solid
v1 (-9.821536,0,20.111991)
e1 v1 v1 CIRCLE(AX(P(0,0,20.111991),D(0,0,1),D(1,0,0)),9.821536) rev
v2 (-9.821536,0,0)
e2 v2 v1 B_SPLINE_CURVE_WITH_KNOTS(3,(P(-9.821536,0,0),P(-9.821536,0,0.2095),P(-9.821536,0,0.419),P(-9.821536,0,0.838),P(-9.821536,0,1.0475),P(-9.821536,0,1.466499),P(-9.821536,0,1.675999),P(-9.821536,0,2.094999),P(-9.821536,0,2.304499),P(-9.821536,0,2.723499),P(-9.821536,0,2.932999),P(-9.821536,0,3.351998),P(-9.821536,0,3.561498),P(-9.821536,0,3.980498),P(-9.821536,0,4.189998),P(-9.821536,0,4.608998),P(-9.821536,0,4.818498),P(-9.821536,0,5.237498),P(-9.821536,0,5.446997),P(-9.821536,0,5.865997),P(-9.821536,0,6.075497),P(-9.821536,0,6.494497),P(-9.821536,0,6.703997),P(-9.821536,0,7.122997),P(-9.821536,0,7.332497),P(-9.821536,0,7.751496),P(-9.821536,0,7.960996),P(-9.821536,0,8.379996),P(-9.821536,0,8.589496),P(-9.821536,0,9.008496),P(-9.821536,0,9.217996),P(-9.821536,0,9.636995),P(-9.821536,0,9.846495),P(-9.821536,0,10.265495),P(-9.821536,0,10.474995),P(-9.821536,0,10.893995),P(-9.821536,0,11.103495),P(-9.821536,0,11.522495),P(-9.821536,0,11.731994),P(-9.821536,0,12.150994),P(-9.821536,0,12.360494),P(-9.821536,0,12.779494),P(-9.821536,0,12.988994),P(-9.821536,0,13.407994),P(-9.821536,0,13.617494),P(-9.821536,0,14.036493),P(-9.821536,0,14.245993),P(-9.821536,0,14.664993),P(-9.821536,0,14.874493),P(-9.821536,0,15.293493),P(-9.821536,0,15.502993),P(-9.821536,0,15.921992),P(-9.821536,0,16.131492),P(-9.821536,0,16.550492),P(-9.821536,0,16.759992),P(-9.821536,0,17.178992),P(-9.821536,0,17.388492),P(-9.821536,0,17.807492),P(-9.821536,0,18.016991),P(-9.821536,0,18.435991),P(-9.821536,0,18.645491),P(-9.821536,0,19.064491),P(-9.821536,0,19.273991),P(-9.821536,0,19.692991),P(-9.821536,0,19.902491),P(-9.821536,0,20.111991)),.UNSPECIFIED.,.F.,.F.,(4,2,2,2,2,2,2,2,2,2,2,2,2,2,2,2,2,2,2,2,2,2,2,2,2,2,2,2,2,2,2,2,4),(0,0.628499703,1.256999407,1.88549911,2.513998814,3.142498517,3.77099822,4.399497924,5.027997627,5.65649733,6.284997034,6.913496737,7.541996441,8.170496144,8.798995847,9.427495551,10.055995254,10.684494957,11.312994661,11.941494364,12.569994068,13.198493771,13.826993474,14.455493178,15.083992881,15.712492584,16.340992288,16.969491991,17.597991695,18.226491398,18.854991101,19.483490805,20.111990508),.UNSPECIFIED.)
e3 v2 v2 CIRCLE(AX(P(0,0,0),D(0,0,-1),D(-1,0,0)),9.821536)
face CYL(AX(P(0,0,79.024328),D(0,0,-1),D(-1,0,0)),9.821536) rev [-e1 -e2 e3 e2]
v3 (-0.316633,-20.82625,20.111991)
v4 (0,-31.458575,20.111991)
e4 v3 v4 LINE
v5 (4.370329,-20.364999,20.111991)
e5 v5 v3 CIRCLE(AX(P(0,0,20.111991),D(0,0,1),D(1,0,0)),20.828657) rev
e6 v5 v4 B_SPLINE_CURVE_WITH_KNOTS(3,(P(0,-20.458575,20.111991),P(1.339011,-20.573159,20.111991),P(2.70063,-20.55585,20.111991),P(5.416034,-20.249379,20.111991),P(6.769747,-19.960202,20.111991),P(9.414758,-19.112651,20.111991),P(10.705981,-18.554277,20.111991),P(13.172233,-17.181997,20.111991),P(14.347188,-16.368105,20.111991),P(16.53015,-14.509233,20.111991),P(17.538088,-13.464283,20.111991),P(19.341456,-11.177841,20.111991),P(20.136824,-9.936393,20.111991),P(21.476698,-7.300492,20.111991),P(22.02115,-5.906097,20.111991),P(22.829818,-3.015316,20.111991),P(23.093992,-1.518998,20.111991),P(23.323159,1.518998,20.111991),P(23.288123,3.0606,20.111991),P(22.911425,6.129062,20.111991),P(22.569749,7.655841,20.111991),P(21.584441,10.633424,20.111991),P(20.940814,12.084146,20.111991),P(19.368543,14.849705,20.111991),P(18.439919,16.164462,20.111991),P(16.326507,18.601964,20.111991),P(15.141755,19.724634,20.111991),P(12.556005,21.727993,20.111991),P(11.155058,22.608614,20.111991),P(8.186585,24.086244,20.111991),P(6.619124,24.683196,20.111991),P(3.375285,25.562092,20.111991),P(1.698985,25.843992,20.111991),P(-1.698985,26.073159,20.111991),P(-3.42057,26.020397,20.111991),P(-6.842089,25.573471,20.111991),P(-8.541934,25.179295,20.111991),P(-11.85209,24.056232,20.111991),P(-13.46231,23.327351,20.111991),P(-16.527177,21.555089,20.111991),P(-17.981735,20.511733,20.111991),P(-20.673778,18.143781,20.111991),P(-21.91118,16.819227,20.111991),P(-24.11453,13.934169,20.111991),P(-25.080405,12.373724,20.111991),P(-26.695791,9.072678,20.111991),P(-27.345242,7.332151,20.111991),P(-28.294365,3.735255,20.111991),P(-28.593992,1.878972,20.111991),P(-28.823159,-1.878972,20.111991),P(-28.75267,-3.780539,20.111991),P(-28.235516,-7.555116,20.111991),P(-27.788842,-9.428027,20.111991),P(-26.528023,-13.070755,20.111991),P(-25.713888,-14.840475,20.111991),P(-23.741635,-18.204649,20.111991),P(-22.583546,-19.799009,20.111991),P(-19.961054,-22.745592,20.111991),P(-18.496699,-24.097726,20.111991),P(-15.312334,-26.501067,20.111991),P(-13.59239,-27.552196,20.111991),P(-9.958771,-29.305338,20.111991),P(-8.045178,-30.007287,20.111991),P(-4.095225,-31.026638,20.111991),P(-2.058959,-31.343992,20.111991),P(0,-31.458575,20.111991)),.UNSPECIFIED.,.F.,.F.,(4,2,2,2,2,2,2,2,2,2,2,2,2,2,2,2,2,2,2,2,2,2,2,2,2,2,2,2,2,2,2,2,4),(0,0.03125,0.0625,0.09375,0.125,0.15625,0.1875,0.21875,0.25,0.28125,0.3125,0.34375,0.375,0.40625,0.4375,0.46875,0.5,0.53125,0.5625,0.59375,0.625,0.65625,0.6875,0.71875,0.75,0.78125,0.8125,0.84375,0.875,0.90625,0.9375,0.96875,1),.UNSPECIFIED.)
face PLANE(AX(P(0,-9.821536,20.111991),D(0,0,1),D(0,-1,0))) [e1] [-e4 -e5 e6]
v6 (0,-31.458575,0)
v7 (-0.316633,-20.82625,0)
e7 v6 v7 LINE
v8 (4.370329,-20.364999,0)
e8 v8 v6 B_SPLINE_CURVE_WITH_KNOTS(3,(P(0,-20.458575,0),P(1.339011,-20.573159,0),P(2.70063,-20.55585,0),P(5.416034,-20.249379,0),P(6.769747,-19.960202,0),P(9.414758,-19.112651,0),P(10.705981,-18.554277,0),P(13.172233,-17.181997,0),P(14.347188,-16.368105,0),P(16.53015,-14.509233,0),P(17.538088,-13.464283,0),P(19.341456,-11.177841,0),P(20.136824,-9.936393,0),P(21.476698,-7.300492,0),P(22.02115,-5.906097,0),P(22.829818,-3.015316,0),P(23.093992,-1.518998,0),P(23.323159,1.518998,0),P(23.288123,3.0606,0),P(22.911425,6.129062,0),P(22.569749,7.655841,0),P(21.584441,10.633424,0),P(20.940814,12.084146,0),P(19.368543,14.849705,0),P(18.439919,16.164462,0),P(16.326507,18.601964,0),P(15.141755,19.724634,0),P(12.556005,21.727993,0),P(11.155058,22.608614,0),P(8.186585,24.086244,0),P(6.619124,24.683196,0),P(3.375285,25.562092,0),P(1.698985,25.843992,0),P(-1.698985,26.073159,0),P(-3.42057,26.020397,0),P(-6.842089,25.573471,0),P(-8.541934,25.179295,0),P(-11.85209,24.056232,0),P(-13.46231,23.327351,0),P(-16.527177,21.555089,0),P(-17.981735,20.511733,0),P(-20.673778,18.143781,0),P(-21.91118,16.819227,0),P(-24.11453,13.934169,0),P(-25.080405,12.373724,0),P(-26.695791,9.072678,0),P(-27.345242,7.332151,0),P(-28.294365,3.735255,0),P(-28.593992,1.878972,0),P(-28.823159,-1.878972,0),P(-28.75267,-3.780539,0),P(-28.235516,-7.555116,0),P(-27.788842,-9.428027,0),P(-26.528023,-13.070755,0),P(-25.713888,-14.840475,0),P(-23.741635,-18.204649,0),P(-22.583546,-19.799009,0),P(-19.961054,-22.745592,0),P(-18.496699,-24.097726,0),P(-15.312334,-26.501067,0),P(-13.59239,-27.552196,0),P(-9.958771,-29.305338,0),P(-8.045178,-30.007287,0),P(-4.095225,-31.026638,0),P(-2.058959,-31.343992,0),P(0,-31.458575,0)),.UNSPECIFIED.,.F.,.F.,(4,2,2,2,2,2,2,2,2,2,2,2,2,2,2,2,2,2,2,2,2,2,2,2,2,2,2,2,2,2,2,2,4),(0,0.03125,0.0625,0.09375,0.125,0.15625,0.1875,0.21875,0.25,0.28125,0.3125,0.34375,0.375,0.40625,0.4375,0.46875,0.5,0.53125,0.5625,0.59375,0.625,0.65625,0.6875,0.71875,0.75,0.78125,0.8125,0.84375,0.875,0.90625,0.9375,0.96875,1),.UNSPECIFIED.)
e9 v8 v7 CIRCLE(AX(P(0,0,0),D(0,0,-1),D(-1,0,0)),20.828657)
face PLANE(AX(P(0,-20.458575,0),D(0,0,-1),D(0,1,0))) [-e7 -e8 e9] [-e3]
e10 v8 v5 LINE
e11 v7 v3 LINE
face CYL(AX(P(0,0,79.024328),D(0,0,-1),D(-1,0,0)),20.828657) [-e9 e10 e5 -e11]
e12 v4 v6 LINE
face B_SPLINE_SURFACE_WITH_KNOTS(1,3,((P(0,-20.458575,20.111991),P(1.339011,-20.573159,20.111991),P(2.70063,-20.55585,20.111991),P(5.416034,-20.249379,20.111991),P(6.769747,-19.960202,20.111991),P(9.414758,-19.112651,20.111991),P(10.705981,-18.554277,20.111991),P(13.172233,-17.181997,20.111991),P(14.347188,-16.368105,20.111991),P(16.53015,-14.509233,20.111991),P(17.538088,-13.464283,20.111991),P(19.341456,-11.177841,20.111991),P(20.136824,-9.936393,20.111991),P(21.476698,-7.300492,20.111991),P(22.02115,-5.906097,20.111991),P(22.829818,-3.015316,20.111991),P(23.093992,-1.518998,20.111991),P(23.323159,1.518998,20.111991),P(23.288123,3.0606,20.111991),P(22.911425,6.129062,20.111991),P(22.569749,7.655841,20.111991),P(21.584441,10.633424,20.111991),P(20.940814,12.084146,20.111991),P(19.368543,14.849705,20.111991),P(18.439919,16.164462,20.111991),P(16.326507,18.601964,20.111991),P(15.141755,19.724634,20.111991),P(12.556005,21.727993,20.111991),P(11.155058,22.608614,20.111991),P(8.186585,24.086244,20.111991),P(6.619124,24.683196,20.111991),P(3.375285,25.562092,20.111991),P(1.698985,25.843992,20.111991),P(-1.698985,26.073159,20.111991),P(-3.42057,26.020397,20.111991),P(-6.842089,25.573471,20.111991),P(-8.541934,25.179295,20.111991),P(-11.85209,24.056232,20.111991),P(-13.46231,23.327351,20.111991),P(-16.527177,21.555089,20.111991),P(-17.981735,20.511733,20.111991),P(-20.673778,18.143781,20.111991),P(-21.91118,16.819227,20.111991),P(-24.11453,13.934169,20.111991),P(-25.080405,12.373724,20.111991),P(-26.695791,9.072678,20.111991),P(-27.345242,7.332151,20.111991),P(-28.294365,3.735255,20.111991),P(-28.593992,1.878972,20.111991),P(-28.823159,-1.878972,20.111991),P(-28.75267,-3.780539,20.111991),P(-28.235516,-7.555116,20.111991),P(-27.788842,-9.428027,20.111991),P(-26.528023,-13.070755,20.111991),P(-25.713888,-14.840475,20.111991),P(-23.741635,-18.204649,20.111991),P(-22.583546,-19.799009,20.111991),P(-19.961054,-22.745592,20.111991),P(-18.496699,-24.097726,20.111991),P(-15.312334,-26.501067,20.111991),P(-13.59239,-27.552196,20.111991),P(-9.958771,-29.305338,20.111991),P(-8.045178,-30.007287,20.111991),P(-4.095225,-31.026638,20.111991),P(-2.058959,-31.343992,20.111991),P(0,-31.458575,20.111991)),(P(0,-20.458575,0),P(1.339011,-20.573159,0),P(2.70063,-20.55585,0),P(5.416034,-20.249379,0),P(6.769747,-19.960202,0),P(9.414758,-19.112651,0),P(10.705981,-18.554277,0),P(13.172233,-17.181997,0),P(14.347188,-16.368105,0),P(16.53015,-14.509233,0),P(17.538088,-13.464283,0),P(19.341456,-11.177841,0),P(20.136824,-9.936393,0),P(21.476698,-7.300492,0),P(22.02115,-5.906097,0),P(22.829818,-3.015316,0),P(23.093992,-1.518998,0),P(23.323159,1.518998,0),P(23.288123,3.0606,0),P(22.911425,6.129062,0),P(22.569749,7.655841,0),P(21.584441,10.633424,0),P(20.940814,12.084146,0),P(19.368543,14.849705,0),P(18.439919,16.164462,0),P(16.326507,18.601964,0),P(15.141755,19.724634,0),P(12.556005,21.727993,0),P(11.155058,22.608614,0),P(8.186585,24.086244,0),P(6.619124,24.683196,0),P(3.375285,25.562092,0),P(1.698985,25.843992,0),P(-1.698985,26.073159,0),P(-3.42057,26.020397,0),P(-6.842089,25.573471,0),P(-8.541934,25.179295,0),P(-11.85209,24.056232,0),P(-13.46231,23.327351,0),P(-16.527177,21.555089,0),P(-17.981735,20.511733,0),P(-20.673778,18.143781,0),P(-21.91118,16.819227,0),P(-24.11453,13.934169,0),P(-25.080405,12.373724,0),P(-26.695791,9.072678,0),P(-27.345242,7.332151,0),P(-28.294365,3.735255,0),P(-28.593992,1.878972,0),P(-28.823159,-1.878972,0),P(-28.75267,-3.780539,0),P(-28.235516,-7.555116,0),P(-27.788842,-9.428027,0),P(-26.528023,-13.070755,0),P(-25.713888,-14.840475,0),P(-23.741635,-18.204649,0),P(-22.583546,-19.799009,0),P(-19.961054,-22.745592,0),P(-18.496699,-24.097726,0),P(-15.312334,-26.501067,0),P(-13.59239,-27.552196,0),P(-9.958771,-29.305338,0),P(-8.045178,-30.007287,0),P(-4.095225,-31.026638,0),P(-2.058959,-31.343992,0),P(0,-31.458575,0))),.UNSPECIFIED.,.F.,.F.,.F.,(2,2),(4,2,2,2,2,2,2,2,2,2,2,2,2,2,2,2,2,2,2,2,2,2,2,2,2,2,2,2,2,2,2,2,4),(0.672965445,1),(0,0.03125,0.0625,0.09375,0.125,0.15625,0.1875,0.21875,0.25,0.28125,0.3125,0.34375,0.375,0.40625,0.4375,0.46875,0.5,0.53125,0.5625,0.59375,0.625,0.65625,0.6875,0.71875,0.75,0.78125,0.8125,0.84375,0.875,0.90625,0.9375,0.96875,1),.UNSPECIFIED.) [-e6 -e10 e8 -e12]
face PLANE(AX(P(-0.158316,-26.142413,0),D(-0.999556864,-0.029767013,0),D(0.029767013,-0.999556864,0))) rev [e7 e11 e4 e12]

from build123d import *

# Parameters (mm, degrees)
BALAYAGE1_DEPTH  = 20.111990508
ESQUISSE14_R     = 20.828656766
ESQUISSE14_R_2   = 9.821536281
EXTRUSION1_DEPTH = 20.111990508


# Read off the part's stored shape, not the designer's step: Balayage1
with BuildPart() as part:
    # Balayage1 outline → Balayage1 (new body)
    with BuildSketch(Plane.XY):
        with BuildLine():
            Line((0, -9.821536281), (0, -20.458575472))
            add(Edge.make_bspline(
                [(0, -20.458575472), (1.339010626, -20.573158804), (2.70063028, -20.555850209), (5.416034469, -20.249379033), (6.769747496, -19.960201828), (9.414757989, -19.112650814), (10.705981442, -18.55427704), (13.172233247, -17.181996667), (14.347188089, -16.368105159), (16.530150458, -14.509233388), (17.538088045, -13.464283054), (19.341456378, -11.177840705), (20.136823748, -9.936392614), (21.476697608, -7.30049231), (22.021150084, -5.906096569), (22.829818439, -3.015315759), (23.093992141, -1.518997704), (23.323158802, 1.518997704), (23.288123466, 3.060599988), (22.911424817, 6.129061533), (22.569748615, 7.655840556), (21.584441456, 10.633423807), (20.940813937, 12.084145796), (19.368542637, 14.849705175), (18.439918891, 16.164461653), (16.326506952, 18.601964191), (15.141754982, 19.724634015), (12.55600506, 21.727993276), (11.155058431, 22.608614389), (8.186585371, 24.086244396), (6.619123633, 24.683195867), (3.375285466, 25.562091698), (1.698984783, 25.843992141), (-1.698984783, 26.073158802), (-3.420569696, 26.020396724), (-6.842088596, 25.573470601), (-8.541933617, 25.179295403), (-11.852089624, 24.056232097), (-13.46231015, 23.327350834), (-16.527177103, 21.555088608), (-17.981735217, 20.511732623), (-20.673777923, 18.143780517), (-21.911179985, 16.81922691), (-24.114530173, 13.934169414), (-25.08040503, 12.373724249), (-26.695791184, 9.072678431), (-27.345241651, 7.332150696), (-28.294364956, 3.735255174), (-28.593992141, 1.878971862), (-28.823158802, -1.878971862), (-28.752669983, -3.780539403), (-28.235516385, -7.55511566), (-27.78884219, -9.428026677), (-26.528022739, -13.070755442), (-25.713887731, -14.840474504), (-23.741634578, -18.204649031), (-22.583546355, -19.79900878), (-19.961054081, -22.745591656), (-18.496698837, -24.097725955), (-15.312333768, -26.501067071), (-13.592390066, -27.552195671), (-9.958771492, -29.305337972), (-8.04517776, -30.007287435), (-4.095224882, -31.026638215), (-2.058958944, -31.343992138), (0, -31.458575472)],
                knots=[0, 0, 0, 0, 0.03125, 0.03125, 0.0625, 0.0625, 0.09375, 0.09375, 0.125, 0.125, 0.15625, 0.15625, 0.1875, 0.1875, 0.21875, 0.21875, 0.25, 0.25, 0.28125, 0.28125, 0.3125, 0.3125, 0.34375, 0.34375, 0.375, 0.375, 0.40625, 0.40625, 0.4375, 0.4375, 0.46875, 0.46875, 0.5, 0.5, 0.53125, 0.53125, 0.5625, 0.5625, 0.59375, 0.59375, 0.625, 0.625, 0.65625, 0.65625, 0.6875, 0.6875, 0.71875, 0.71875, 0.75, 0.75, 0.78125, 0.78125, 0.8125, 0.8125, 0.84375, 0.84375, 0.875, 0.875, 0.90625, 0.90625, 0.9375, 0.9375, 0.96875, 0.96875, 1, 1, 1, 1], degree=3))
            Line((0, -31.458575472), (-0.316632886, -20.826249933))
            add(Edge.make_bspline(
                [(0, -9.821536281), (0.635526395, -9.936138625), (1.300455961, -9.987934945), (2.636552256, -9.957838834), (3.320925459, -9.873243661), (4.668076386, -9.5674891), (5.343310383, -9.341099222), (6.64362309, -8.754770806), (7.279880465, -8.38726265), (8.474113795, -7.527760952), (9.041558169, -7.02615667), (10.07176339, -5.913499999), (10.541916964, -5.291172391), (11.354136158, -3.957730474), (11.701234565, -3.234117001), (12.248134534, -1.72376755), (12.450416733, -0.923795696), (12.693735378, 0.709479025), (12.734607395, 1.556239501), (12.647294177, 3.250272888), (12.516309238, 4.110702398), (12.084251503, 5.797512451), (11.777855658, 6.636238321), (11.001097913, 8.244754836), (10.523099181, 9.025601486), (9.416482329, 10.484642069), (8.77821251, 11.172175284), (7.37138377, 12.413546157), (6.59153484, 12.97464608), (4.928305632, 13.936234248), (4.032436553, 14.34162839), (2.169493947, 14.970347994), (1.1892182, 15.196035253), (-0.805775701, 15.450493161), (-1.833897105, 15.478992523), (-3.884755387, 15.331746496), (-4.920576993, 15.153109804), (-6.945499252, 14.59240664), (-7.946859496, 14.204943326), (-9.86169286, 13.235843787), (-10.786126333, 12.646516501), (-12.507846215, 11.291337805), (-13.314370432, 10.515800987), (-14.764637575, 8.813835324), (-15.41553956, 7.876103443), (-16.524182446, 5.882601148), (-16.986728243, 4.81434898), (-17.694998732, 2.59878648), (-17.942990079, 1.438299746), (-18.206445521, -0.918016148), (-18.221552303, -2.127205893), (-18.012429229, -4.534115789), (-17.785233919, -5.744863598), (-17.094196375, -8.106806531), (-16.624897206, -9.270192625), (-15.462066247, -11.489998098), (-14.760798926, -12.557300792), (-13.155997853, -14.540171398), (-12.24275076, -15.464894963), (-10.244932242, -17.122416889), (-9.149046646, -17.862290367), (-6.824901676, -19.116303402), (-5.584165841, -19.635165362), (-3.015949138, -20.421325406), (-1.675315677, -20.690816726), (-0.316632886, -20.826249933)],
                knots=[0, 0, 0, 0, 0.03125, 0.03125, 0.0625, 0.0625, 0.09375, 0.09375, 0.125, 0.125, 0.15625, 0.15625, 0.1875, 0.1875, 0.21875, 0.21875, 0.25, 0.25, 0.28125, 0.28125, 0.3125, 0.3125, 0.34375, 0.34375, 0.375, 0.375, 0.40625, 0.40625, 0.4375, 0.4375, 0.46875, 0.46875, 0.5, 0.5, 0.53125, 0.53125, 0.5625, 0.5625, 0.59375, 0.59375, 0.625, 0.625, 0.65625, 0.65625, 0.6875, 0.6875, 0.71875, 0.71875, 0.75, 0.75, 0.78125, 0.78125, 0.8125, 0.8125, 0.84375, 0.84375, 0.875, 0.875, 0.90625, 0.90625, 0.9375, 0.9375, 0.96875, 0.96875, 1, 1, 1, 1], degree=3))
        make_face()
    extrude(amount=BALAYAGE1_DEPTH)

    # Esquisse14 → Extrusion1 (add)
    with BuildSketch(Plane(origin=(0, 0, 0), x_dir=(-1, 0, 0), z_dir=(0, 0, -1))):
        Circle(ESQUISSE14_R)
        Circle(ESQUISSE14_R_2, mode=Mode.SUBTRACT)
    extrude(amount=-EXTRUSION1_DEPTH)


solid = part.part
